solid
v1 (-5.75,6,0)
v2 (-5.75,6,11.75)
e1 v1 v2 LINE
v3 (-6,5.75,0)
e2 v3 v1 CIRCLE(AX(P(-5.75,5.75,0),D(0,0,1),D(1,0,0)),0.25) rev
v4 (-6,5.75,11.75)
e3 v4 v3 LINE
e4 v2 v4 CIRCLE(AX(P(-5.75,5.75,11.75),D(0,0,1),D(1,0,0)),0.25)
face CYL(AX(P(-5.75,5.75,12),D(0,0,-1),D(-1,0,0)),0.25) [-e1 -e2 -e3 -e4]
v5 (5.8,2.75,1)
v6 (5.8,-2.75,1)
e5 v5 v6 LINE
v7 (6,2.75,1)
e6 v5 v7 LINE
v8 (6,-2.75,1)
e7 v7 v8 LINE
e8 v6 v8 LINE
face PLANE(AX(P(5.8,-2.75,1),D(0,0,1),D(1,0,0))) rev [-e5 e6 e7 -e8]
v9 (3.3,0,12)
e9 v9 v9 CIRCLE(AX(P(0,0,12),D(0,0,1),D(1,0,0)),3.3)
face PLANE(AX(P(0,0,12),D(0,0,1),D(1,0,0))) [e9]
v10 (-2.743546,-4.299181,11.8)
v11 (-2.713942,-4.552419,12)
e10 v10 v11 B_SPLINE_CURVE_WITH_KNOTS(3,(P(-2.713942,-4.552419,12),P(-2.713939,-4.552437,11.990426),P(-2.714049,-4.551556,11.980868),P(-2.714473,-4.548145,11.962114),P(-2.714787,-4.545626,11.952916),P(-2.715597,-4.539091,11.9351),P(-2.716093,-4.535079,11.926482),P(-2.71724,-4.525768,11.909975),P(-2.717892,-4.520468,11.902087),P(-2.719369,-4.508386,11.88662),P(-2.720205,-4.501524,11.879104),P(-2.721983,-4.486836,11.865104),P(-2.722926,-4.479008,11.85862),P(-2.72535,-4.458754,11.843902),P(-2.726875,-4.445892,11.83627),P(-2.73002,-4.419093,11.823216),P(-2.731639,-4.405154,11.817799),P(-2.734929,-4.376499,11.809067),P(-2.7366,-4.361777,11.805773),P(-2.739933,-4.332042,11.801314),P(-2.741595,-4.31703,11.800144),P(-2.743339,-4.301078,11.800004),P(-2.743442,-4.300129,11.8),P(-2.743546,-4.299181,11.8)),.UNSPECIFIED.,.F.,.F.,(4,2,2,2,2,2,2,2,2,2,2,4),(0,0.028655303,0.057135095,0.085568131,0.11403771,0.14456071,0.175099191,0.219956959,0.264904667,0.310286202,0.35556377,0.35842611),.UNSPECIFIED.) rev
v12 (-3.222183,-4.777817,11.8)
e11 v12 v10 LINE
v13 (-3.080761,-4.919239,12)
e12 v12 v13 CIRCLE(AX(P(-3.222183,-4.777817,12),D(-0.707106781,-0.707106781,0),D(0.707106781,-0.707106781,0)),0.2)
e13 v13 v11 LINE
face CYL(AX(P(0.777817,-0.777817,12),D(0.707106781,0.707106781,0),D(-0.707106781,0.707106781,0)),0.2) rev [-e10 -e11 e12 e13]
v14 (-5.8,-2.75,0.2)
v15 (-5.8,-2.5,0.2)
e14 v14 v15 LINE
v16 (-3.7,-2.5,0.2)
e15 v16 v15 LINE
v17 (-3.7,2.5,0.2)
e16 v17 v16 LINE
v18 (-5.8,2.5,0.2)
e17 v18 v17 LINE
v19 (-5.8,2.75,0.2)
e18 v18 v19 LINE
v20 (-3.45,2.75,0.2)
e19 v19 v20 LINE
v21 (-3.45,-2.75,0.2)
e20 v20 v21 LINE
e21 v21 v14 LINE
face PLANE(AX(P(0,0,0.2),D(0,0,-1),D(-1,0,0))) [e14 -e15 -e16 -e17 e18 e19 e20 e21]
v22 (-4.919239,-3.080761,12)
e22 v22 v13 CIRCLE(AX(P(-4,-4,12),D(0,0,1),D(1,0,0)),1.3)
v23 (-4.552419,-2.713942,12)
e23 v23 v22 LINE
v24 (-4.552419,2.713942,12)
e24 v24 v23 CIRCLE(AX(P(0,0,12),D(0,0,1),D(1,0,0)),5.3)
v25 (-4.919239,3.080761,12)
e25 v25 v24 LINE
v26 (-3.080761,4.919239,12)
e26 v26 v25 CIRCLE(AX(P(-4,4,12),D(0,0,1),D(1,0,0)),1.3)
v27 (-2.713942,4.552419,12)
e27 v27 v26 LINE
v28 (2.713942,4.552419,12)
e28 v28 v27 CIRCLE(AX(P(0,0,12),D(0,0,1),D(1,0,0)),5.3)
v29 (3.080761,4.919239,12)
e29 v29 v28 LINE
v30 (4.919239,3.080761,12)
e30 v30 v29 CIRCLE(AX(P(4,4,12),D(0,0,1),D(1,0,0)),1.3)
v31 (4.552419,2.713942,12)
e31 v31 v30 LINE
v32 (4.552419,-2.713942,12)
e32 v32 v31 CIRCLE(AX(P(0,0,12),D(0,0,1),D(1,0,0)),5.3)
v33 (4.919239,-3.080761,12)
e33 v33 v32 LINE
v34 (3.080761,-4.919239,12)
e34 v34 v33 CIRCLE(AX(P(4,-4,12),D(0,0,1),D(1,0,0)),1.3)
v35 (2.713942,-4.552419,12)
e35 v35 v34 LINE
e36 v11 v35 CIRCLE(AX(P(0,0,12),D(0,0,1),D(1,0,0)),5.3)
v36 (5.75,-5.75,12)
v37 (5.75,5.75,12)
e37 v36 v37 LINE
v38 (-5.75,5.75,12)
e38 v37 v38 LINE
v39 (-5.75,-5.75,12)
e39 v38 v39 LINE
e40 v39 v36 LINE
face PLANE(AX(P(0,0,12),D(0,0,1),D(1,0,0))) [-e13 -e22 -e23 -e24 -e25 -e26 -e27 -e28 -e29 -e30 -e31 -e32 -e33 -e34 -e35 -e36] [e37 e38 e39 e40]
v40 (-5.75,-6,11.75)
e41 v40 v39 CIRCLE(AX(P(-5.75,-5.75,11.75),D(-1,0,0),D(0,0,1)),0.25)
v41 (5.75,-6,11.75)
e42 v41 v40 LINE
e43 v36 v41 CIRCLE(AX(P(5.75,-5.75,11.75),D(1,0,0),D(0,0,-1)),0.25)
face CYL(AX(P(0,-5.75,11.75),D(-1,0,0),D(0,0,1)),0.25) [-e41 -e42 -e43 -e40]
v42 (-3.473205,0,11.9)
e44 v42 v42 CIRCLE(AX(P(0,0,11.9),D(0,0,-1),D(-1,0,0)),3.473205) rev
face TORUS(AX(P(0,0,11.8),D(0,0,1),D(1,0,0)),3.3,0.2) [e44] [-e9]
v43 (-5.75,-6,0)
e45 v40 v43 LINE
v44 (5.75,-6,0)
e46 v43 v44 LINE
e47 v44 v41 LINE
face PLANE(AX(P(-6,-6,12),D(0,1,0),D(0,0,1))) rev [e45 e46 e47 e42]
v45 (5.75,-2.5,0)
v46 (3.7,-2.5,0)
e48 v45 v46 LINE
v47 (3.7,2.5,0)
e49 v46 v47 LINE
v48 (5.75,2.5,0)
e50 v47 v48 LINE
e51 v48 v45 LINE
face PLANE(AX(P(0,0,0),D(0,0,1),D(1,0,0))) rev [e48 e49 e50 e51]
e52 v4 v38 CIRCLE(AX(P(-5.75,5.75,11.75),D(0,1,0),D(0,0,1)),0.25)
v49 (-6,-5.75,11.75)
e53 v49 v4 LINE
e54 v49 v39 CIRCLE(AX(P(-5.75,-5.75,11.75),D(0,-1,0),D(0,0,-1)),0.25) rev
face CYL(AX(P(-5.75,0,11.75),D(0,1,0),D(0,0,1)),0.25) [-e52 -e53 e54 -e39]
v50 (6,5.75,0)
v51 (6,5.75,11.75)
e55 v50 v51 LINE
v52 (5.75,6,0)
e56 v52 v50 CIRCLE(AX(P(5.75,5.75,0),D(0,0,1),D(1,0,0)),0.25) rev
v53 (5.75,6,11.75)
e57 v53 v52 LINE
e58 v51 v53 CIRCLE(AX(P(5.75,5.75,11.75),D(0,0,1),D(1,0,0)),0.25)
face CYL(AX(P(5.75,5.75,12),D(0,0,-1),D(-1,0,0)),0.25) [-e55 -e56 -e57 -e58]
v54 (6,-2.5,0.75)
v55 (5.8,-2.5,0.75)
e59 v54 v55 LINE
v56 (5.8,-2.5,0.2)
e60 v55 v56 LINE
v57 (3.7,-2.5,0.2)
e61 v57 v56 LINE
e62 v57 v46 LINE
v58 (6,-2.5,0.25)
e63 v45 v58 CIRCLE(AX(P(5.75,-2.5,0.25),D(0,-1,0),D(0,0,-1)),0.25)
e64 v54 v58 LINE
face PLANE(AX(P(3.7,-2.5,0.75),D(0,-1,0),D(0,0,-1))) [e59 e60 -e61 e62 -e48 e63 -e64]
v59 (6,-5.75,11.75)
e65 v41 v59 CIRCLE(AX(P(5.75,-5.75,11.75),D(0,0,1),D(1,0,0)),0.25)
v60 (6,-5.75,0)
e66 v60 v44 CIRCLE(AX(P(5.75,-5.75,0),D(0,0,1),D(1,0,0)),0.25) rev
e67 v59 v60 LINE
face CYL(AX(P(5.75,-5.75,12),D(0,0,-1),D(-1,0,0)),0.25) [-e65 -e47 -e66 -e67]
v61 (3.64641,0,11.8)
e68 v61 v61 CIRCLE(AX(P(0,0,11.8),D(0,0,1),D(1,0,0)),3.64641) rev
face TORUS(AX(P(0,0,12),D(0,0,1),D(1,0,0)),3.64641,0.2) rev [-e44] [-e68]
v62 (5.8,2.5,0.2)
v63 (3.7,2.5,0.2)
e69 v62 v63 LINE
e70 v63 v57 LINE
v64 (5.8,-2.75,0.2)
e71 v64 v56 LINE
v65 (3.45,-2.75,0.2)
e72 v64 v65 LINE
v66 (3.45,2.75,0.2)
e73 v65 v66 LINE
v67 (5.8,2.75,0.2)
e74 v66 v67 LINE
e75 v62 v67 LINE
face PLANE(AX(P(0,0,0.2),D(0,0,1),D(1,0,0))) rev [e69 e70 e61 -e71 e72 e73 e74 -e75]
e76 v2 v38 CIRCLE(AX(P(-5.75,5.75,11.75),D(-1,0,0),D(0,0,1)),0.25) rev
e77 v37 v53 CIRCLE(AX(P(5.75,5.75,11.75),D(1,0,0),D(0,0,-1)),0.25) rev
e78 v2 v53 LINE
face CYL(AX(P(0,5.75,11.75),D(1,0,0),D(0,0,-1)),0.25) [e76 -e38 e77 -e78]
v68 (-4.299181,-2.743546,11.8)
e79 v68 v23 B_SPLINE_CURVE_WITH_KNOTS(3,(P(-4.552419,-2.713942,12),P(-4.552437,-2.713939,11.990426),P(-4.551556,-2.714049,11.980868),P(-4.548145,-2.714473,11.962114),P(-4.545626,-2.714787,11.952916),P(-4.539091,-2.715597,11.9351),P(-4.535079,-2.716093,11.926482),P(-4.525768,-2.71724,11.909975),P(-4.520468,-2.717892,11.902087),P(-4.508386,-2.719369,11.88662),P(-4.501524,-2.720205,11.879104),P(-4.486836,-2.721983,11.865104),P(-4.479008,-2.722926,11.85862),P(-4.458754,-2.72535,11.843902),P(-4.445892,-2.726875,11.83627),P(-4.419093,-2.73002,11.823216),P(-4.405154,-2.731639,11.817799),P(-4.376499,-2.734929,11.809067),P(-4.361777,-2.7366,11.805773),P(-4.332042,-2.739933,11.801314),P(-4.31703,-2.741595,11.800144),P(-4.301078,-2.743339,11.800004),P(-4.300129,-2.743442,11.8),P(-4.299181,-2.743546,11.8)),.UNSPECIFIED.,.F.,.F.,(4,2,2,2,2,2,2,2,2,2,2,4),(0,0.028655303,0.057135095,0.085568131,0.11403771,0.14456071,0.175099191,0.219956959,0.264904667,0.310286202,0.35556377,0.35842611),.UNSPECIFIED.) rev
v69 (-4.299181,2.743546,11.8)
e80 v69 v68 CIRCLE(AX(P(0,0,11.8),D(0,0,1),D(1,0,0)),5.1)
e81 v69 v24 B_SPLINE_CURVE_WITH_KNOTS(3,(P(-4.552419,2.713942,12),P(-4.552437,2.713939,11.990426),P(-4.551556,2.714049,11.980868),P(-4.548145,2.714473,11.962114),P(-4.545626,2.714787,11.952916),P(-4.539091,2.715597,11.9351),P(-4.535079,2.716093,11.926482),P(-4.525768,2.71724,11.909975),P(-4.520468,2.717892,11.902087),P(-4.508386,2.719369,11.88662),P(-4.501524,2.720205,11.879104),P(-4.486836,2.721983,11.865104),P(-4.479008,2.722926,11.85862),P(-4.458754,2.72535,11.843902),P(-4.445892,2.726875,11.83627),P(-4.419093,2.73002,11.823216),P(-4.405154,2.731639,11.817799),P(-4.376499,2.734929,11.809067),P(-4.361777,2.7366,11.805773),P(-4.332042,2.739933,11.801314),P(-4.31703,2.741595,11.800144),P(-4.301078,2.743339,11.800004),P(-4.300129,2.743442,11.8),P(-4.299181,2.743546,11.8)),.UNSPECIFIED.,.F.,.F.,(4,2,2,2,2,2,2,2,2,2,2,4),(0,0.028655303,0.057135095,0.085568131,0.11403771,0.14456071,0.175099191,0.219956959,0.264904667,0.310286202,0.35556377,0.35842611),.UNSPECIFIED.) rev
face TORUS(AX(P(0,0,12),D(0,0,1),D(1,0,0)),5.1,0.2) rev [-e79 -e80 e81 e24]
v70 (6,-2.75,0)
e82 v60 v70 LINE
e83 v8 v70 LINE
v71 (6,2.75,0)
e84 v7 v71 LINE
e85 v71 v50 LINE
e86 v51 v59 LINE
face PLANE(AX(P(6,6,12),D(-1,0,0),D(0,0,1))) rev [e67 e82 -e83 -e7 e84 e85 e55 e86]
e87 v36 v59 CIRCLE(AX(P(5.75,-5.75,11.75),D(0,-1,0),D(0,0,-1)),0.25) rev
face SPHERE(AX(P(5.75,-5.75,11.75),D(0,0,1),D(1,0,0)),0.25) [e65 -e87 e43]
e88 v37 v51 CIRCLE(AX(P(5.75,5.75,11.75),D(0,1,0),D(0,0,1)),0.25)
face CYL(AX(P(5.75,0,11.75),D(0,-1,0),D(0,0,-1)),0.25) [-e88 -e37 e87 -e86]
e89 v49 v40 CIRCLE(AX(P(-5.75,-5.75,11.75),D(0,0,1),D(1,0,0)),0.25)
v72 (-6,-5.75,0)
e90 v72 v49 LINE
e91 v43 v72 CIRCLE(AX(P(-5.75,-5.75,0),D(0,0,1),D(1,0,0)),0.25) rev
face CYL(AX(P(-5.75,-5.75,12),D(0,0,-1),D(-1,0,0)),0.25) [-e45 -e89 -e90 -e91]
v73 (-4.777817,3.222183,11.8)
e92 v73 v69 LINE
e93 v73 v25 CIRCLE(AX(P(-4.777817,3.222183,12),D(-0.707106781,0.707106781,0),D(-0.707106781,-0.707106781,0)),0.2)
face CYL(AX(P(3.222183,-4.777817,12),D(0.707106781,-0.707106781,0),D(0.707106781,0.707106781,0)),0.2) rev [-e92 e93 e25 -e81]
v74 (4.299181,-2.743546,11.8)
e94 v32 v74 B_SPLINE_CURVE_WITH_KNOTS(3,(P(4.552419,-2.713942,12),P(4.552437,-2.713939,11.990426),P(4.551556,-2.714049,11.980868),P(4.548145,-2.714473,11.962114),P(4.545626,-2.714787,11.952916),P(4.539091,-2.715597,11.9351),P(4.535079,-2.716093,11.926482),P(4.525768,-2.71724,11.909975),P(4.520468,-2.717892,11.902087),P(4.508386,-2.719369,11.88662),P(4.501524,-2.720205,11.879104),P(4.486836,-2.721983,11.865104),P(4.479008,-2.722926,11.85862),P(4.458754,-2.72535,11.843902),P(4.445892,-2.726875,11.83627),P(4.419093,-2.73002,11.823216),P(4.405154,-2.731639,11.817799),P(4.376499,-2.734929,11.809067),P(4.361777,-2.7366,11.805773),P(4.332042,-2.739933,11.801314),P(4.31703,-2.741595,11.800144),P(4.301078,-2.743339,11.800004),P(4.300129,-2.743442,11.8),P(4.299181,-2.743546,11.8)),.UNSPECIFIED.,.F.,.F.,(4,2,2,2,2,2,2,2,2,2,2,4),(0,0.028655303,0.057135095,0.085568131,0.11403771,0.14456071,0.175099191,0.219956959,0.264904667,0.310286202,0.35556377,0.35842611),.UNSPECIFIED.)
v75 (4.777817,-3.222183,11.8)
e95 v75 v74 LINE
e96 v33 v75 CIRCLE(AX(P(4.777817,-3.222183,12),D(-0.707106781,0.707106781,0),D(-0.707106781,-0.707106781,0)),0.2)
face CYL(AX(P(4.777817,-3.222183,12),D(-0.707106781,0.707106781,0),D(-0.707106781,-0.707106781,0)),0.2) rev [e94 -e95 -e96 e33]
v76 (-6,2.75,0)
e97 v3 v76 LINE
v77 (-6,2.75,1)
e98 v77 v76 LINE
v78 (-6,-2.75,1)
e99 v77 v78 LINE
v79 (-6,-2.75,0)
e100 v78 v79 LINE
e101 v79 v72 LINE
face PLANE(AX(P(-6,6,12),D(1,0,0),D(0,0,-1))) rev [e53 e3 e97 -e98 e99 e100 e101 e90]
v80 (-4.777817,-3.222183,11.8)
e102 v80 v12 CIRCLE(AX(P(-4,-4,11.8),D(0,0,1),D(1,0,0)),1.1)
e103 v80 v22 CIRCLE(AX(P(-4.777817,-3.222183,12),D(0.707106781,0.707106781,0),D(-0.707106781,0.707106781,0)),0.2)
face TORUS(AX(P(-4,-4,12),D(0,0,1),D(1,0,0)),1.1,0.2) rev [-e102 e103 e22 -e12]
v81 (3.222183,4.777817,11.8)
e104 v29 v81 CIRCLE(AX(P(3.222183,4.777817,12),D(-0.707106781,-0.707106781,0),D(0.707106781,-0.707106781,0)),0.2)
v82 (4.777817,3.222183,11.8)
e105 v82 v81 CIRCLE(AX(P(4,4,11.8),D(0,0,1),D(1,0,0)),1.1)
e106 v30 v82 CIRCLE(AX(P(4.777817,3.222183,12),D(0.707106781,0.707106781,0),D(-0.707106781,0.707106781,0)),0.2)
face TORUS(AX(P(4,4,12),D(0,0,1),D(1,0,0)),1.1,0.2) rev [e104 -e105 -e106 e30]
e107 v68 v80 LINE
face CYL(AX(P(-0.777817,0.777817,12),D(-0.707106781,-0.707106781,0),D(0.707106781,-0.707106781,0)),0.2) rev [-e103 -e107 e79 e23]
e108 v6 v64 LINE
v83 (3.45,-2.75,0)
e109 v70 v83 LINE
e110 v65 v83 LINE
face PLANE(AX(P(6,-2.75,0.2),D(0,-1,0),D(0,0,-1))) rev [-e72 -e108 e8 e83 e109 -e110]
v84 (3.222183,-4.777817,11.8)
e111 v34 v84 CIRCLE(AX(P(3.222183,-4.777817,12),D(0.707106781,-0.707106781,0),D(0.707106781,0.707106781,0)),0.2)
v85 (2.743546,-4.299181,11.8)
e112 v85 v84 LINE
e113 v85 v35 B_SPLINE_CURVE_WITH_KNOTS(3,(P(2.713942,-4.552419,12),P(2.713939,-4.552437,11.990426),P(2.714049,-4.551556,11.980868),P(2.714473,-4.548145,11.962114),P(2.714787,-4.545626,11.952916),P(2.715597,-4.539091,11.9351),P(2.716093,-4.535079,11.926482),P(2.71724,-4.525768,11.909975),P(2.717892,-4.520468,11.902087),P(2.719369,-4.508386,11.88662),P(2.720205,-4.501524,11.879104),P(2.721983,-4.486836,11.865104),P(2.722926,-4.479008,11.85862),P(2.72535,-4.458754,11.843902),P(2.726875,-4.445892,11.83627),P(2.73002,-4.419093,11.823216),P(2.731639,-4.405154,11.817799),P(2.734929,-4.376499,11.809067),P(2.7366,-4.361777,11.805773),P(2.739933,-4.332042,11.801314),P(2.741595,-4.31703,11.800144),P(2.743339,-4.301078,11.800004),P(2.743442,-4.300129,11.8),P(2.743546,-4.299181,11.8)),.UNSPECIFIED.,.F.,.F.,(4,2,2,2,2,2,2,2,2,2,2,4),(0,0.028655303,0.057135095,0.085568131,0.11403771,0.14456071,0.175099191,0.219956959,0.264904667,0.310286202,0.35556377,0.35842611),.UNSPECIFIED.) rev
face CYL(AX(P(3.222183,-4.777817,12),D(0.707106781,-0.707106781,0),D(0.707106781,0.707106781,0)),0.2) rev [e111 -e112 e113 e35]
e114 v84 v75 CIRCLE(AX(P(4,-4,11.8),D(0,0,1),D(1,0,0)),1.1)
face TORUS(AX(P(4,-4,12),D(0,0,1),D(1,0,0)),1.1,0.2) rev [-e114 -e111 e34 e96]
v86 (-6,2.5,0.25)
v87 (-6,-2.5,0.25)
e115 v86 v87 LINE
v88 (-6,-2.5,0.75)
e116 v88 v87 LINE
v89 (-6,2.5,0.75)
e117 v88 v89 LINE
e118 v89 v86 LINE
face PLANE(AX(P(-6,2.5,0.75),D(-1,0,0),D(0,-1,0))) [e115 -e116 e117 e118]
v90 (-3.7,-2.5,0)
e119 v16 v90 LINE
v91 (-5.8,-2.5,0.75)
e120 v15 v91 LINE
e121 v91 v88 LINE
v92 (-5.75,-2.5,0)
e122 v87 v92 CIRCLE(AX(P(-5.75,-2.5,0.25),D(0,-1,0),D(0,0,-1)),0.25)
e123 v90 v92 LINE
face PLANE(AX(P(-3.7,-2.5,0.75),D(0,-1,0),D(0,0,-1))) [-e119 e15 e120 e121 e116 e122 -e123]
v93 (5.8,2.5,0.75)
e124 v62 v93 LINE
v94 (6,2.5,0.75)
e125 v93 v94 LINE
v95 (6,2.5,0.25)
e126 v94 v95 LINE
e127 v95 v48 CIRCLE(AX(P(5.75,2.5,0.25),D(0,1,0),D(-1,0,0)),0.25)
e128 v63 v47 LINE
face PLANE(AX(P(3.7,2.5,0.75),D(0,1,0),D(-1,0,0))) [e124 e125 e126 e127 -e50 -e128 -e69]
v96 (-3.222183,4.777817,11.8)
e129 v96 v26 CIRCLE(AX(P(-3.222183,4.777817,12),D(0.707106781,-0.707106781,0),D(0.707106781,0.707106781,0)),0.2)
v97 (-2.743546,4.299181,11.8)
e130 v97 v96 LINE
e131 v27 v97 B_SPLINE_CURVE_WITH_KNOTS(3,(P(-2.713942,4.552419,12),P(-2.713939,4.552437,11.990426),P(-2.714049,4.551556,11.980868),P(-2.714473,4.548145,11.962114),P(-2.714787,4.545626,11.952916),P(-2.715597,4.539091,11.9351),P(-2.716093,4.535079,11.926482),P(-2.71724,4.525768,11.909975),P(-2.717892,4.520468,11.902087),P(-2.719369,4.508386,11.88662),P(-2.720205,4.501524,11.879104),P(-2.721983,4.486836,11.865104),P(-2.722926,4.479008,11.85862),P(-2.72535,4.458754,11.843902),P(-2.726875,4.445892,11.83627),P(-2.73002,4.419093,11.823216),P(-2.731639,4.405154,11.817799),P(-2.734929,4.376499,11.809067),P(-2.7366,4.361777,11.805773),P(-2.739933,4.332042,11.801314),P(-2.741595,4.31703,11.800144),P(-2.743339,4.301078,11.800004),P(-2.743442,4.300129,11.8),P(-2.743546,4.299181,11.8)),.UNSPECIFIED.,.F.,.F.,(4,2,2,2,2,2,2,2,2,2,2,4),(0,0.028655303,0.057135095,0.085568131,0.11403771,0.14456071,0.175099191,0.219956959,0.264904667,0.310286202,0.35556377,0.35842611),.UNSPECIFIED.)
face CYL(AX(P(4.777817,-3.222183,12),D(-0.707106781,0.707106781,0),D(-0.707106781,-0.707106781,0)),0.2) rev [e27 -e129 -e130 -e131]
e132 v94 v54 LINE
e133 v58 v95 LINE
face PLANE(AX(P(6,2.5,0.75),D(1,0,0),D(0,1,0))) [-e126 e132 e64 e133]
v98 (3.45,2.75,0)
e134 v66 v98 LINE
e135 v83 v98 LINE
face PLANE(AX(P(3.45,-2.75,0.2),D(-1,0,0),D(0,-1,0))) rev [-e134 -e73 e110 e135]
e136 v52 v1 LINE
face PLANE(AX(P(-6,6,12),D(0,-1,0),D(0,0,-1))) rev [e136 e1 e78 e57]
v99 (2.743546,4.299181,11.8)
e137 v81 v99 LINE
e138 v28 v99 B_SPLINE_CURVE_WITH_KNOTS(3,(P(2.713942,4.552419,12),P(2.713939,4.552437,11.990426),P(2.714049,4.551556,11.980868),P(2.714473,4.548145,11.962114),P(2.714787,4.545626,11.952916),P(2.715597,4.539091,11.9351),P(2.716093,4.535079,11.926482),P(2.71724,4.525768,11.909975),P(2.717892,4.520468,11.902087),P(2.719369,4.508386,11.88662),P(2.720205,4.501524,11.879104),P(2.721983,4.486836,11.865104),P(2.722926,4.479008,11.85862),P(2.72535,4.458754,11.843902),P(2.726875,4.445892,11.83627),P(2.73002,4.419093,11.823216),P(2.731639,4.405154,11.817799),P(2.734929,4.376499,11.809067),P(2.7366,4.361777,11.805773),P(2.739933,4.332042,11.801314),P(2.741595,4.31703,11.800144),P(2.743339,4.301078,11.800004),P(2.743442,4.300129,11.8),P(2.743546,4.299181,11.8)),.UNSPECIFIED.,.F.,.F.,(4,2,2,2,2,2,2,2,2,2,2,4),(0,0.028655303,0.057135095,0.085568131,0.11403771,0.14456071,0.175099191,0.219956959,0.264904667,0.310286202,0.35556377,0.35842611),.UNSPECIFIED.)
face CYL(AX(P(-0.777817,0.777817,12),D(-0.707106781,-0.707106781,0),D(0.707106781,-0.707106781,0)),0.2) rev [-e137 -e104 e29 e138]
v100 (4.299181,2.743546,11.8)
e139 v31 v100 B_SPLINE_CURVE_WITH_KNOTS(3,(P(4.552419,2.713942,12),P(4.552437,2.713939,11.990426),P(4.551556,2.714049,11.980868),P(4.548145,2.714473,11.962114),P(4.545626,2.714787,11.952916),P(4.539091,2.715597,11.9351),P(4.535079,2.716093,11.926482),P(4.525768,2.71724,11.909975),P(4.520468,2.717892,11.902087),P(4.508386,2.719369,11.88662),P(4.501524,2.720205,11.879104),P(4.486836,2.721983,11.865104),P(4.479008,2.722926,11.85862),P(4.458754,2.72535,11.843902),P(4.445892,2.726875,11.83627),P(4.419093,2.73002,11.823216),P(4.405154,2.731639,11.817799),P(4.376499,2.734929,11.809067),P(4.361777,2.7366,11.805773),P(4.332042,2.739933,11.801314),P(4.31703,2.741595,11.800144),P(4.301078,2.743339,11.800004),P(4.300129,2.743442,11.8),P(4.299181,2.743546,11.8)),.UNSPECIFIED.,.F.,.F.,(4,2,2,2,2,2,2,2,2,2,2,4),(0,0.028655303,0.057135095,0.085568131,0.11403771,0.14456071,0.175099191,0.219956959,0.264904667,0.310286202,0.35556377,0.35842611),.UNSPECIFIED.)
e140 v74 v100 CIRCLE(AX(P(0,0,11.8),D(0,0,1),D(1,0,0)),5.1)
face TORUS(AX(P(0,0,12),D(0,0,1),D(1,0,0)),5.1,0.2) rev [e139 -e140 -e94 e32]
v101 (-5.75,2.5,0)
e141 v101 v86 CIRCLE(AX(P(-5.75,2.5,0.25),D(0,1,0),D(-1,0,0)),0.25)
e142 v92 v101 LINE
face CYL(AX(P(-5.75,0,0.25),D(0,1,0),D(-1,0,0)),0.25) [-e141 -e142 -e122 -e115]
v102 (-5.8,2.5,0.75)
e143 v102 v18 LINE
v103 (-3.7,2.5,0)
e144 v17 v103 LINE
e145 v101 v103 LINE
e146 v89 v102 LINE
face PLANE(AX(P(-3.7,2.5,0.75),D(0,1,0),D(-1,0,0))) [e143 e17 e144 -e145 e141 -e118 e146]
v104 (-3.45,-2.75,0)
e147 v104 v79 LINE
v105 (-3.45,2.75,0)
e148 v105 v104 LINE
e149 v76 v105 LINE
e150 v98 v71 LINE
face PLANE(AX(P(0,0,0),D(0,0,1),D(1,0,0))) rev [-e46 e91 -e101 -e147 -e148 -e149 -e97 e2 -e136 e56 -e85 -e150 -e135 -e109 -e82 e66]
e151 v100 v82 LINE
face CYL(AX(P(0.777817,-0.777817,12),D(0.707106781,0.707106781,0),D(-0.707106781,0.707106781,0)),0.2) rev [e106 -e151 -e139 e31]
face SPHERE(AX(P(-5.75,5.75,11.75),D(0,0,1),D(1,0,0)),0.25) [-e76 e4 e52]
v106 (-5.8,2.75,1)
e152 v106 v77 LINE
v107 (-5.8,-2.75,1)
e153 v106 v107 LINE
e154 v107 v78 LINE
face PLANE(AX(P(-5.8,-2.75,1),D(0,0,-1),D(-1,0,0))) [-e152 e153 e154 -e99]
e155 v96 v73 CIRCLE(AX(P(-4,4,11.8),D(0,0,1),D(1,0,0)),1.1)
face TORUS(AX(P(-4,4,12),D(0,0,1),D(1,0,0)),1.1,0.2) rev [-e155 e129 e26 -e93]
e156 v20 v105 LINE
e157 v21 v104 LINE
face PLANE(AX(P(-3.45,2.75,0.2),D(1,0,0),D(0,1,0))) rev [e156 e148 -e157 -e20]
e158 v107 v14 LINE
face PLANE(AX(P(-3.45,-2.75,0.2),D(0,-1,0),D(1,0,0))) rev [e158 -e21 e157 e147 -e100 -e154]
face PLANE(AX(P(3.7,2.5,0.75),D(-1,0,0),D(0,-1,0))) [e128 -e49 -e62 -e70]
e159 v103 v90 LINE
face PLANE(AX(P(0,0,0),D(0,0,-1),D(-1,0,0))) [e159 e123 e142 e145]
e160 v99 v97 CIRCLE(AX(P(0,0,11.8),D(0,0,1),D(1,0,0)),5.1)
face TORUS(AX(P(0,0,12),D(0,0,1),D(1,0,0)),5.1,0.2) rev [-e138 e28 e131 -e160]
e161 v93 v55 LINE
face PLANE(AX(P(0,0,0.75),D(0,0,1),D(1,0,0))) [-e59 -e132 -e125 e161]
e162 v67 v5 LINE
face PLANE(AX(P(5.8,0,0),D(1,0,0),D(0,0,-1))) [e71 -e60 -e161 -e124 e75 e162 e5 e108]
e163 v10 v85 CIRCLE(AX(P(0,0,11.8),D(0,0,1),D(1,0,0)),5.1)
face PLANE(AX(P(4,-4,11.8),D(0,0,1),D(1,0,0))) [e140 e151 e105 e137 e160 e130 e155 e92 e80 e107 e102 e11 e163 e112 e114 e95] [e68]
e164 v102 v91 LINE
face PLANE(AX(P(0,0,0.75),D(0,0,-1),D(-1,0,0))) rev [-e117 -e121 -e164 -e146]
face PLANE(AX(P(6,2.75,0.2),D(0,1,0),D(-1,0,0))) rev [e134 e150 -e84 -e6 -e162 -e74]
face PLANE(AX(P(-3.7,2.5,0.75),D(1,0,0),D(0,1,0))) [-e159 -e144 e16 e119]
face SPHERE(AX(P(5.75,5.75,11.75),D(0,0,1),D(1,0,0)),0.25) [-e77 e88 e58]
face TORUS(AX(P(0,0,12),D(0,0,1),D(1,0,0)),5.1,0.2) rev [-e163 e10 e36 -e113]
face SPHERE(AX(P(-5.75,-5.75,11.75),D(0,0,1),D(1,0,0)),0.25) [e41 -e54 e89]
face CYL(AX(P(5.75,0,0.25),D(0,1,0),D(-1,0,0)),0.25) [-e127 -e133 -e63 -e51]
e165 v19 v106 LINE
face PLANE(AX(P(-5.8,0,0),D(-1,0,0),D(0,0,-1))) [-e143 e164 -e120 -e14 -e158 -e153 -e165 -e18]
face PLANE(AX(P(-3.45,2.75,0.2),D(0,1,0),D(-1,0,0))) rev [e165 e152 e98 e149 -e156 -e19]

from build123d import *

# Parameters (mm, degrees)
SKETCH2_W           = 12
SKETCH2_H           = 12
BOSS_EXTRUDE1_DEPTH = 12
SKETCH3_W           = 2.55
SKETCH3_H           = 5.5
CUT_EXTRUDE1_DEPTH  = 0.2
SKETCH4_W           = 0.8
SKETCH4_H           = 5.5
CUT_EXTRUDE2_DEPTH  = 0.2
FILLET1_R           = 0.25
SKETCH5_W           = 2.3
SKETCH5_H           = 5
BOSS_EXTRUDE2_DEPTH = 0.75
FILLET2_R           = 0.25
SKETCH6_R           = 3.5
CUT_EXTRUDE3_DEPTH  = 0.2
FILLET3_R           = 0.2
FILLET4_R           = 0.2


with BuildPart() as part:
    # Sketch2 → Boss-Extrude1 (new body)
    with BuildSketch(Plane.XY):
        Rectangle(SKETCH2_W, SKETCH2_H)
    extrude(amount=BOSS_EXTRUDE1_DEPTH)

    # Sketch3 → Cut-Extrude1 (cut)
    with BuildSketch(Plane(origin=(0, 0, 0), x_dir=(-1, 0, 0), z_dir=(0, 0, -1))):
        with Locations((-4.725, 0)):
            Rectangle(SKETCH3_W, SKETCH3_H)
        with Locations((4.725, 0)):
            Rectangle(SKETCH3_W, SKETCH3_H)
    extrude(amount=-CUT_EXTRUDE1_DEPTH, mode=Mode.SUBTRACT)

    # Sketch4 → Cut-Extrude2 (cut)
    with BuildSketch(Plane(origin=(6, 0, 0), x_dir=(0, 0, -1), z_dir=(1, 0, 0))):
        with Locations((-0.6, 0)):
            Rectangle(SKETCH4_W, SKETCH4_H)
    cut_extrude2 = extrude(amount=-CUT_EXTRUDE2_DEPTH, mode=Mode.SUBTRACT)

    # Mirror1: Cut-Extrude2 across plane
    add(cut_extrude2.mirror(Plane(origin=(0, 0, 0), x_dir=(0, 0, 1), z_dir=(1, 0, 0))), mode=Mode.SUBTRACT)

    # Fillet1
    fillet1_edges = [part.edges().sort_by_distance(p)[0] for p in [
        (6, 0, 12),
        (0, 6, 12),
        (-6, 0, 12),
        (0, -6, 12),
        (-6, 6, 6),
        (6, 6, 6),
        (6, -6, 6),
        (-6, -6, 6),
    ]]
    fillet(fillet1_edges, radius=FILLET1_R)

    # Sketch5 → Boss-Extrude2 (add)
    with BuildSketch(Plane(origin=(0, 0, 0), x_dir=(-1, 0, 0), z_dir=(0, 0, -1))):
        with Locations((-4.85, 0)):
            Rectangle(SKETCH5_W, SKETCH5_H)
        with Locations((4.85, 0)):
            Rectangle(SKETCH5_W, SKETCH5_H)
    extrude(amount=-BOSS_EXTRUDE2_DEPTH)

    # Fillet2
    fillet2_edges = [part.edges().sort_by_distance(p)[0] for p in [
        (6, 0, 0),
        (-6, 0, 0),
    ]]
    fillet(fillet2_edges, radius=FILLET2_R)

    # Sketch6 → Cut-Extrude3 (cut)
    with BuildSketch(Plane.XY.offset(12)):
        with BuildLine():
            Line((3.080761184, -4.919238816), (2.713941609, -4.55241924))
            ThreePointArc((2.713941609, -4.55241924), (0, -5.3), (-2.713941609, -4.55241924))
            Line((-2.713941609, -4.55241924), (-3.080761184, -4.919238816))
            ThreePointArc((-3.080761184, -4.919238816), (-4.919238816, -4.919238816), (-4.919238816, -3.080761184))
            Line((-4.919238816, -3.080761184), (-4.55241924, -2.713941609))
            ThreePointArc((-4.55241924, -2.713941609), (-5.3, 0), (-4.55241924, 2.713941609))
            Line((-4.55241924, 2.713941609), (-4.919238816, 3.080761184))
            ThreePointArc((-4.919238816, 3.080761184), (-4.919238816, 4.919238816), (-3.080761184, 4.919238816))
            Line((-3.080761184, 4.919238816), (-2.713941609, 4.55241924))
            ThreePointArc((-2.713941609, 4.55241924), (0, 5.3), (2.713941609, 4.55241924))
            Line((2.713941609, 4.55241924), (3.080761184, 4.919238816))
            ThreePointArc((3.080761184, 4.919238816), (4.919238816, 4.919238816), (4.919238816, 3.080761184))
            Line((4.919238816, 3.080761184), (4.55241924, 2.713941609))
            ThreePointArc((4.55241924, 2.713941609), (5.3, 0), (4.55241924, -2.713941609))
            Line((4.55241924, -2.713941609), (4.919238816, -3.080761184))
            ThreePointArc((4.919238816, -3.080761184), (4.919238816, -4.919238816), (3.080761184, -4.919238816))
        make_face()
        Circle(SKETCH6_R, mode=Mode.SUBTRACT)
    extrude(amount=-CUT_EXTRUDE3_DEPTH, mode=Mode.SUBTRACT)

    # Fillet3
    fillet3_edges = [part.edges().sort_by_distance(p)[0] for p in [
        (-3.5, 0, 12),
    ]]
    fillet(fillet3_edges, radius=FILLET3_R - 0.0001)  # a hair under: the kernel refuses the full size

    # Fillet4
    fillet4_edges = [part.edges().sort_by_distance(p)[0] for p in [
        (2.897351397, -4.735829028, 11.8),
        (0, -5.3, 11.8),
        (-2.897351397, -4.735829028, 11.8),
        (-4.919238816, -4.919238816, 11.8),
        (-4.735829028, -2.897351397, 11.8),
        (-5.3, 0, 11.8),
        (-4.735829028, 2.897351397, 11.8),
        (-4.919238816, 4.919238816, 11.8),
        (-2.897351397, 4.735829028, 11.8),
        (0, 5.3, 11.8),
        (2.897351397, 4.735829028, 11.8),
        (4.919238816, 4.919238816, 11.8),
        (4.735829028, 2.897351397, 11.8),
        (5.3, 0, 11.8),
        (4.735829028, -2.897351397, 11.8),
        (4.919238816, -4.919238816, 11.8),
        (-3.5, 0, 11.8),
    ]]
    fillet(fillet4_edges, radius=FILLET4_R - 0.0001)  # a hair under: the kernel refuses the full size


solid = part.part
